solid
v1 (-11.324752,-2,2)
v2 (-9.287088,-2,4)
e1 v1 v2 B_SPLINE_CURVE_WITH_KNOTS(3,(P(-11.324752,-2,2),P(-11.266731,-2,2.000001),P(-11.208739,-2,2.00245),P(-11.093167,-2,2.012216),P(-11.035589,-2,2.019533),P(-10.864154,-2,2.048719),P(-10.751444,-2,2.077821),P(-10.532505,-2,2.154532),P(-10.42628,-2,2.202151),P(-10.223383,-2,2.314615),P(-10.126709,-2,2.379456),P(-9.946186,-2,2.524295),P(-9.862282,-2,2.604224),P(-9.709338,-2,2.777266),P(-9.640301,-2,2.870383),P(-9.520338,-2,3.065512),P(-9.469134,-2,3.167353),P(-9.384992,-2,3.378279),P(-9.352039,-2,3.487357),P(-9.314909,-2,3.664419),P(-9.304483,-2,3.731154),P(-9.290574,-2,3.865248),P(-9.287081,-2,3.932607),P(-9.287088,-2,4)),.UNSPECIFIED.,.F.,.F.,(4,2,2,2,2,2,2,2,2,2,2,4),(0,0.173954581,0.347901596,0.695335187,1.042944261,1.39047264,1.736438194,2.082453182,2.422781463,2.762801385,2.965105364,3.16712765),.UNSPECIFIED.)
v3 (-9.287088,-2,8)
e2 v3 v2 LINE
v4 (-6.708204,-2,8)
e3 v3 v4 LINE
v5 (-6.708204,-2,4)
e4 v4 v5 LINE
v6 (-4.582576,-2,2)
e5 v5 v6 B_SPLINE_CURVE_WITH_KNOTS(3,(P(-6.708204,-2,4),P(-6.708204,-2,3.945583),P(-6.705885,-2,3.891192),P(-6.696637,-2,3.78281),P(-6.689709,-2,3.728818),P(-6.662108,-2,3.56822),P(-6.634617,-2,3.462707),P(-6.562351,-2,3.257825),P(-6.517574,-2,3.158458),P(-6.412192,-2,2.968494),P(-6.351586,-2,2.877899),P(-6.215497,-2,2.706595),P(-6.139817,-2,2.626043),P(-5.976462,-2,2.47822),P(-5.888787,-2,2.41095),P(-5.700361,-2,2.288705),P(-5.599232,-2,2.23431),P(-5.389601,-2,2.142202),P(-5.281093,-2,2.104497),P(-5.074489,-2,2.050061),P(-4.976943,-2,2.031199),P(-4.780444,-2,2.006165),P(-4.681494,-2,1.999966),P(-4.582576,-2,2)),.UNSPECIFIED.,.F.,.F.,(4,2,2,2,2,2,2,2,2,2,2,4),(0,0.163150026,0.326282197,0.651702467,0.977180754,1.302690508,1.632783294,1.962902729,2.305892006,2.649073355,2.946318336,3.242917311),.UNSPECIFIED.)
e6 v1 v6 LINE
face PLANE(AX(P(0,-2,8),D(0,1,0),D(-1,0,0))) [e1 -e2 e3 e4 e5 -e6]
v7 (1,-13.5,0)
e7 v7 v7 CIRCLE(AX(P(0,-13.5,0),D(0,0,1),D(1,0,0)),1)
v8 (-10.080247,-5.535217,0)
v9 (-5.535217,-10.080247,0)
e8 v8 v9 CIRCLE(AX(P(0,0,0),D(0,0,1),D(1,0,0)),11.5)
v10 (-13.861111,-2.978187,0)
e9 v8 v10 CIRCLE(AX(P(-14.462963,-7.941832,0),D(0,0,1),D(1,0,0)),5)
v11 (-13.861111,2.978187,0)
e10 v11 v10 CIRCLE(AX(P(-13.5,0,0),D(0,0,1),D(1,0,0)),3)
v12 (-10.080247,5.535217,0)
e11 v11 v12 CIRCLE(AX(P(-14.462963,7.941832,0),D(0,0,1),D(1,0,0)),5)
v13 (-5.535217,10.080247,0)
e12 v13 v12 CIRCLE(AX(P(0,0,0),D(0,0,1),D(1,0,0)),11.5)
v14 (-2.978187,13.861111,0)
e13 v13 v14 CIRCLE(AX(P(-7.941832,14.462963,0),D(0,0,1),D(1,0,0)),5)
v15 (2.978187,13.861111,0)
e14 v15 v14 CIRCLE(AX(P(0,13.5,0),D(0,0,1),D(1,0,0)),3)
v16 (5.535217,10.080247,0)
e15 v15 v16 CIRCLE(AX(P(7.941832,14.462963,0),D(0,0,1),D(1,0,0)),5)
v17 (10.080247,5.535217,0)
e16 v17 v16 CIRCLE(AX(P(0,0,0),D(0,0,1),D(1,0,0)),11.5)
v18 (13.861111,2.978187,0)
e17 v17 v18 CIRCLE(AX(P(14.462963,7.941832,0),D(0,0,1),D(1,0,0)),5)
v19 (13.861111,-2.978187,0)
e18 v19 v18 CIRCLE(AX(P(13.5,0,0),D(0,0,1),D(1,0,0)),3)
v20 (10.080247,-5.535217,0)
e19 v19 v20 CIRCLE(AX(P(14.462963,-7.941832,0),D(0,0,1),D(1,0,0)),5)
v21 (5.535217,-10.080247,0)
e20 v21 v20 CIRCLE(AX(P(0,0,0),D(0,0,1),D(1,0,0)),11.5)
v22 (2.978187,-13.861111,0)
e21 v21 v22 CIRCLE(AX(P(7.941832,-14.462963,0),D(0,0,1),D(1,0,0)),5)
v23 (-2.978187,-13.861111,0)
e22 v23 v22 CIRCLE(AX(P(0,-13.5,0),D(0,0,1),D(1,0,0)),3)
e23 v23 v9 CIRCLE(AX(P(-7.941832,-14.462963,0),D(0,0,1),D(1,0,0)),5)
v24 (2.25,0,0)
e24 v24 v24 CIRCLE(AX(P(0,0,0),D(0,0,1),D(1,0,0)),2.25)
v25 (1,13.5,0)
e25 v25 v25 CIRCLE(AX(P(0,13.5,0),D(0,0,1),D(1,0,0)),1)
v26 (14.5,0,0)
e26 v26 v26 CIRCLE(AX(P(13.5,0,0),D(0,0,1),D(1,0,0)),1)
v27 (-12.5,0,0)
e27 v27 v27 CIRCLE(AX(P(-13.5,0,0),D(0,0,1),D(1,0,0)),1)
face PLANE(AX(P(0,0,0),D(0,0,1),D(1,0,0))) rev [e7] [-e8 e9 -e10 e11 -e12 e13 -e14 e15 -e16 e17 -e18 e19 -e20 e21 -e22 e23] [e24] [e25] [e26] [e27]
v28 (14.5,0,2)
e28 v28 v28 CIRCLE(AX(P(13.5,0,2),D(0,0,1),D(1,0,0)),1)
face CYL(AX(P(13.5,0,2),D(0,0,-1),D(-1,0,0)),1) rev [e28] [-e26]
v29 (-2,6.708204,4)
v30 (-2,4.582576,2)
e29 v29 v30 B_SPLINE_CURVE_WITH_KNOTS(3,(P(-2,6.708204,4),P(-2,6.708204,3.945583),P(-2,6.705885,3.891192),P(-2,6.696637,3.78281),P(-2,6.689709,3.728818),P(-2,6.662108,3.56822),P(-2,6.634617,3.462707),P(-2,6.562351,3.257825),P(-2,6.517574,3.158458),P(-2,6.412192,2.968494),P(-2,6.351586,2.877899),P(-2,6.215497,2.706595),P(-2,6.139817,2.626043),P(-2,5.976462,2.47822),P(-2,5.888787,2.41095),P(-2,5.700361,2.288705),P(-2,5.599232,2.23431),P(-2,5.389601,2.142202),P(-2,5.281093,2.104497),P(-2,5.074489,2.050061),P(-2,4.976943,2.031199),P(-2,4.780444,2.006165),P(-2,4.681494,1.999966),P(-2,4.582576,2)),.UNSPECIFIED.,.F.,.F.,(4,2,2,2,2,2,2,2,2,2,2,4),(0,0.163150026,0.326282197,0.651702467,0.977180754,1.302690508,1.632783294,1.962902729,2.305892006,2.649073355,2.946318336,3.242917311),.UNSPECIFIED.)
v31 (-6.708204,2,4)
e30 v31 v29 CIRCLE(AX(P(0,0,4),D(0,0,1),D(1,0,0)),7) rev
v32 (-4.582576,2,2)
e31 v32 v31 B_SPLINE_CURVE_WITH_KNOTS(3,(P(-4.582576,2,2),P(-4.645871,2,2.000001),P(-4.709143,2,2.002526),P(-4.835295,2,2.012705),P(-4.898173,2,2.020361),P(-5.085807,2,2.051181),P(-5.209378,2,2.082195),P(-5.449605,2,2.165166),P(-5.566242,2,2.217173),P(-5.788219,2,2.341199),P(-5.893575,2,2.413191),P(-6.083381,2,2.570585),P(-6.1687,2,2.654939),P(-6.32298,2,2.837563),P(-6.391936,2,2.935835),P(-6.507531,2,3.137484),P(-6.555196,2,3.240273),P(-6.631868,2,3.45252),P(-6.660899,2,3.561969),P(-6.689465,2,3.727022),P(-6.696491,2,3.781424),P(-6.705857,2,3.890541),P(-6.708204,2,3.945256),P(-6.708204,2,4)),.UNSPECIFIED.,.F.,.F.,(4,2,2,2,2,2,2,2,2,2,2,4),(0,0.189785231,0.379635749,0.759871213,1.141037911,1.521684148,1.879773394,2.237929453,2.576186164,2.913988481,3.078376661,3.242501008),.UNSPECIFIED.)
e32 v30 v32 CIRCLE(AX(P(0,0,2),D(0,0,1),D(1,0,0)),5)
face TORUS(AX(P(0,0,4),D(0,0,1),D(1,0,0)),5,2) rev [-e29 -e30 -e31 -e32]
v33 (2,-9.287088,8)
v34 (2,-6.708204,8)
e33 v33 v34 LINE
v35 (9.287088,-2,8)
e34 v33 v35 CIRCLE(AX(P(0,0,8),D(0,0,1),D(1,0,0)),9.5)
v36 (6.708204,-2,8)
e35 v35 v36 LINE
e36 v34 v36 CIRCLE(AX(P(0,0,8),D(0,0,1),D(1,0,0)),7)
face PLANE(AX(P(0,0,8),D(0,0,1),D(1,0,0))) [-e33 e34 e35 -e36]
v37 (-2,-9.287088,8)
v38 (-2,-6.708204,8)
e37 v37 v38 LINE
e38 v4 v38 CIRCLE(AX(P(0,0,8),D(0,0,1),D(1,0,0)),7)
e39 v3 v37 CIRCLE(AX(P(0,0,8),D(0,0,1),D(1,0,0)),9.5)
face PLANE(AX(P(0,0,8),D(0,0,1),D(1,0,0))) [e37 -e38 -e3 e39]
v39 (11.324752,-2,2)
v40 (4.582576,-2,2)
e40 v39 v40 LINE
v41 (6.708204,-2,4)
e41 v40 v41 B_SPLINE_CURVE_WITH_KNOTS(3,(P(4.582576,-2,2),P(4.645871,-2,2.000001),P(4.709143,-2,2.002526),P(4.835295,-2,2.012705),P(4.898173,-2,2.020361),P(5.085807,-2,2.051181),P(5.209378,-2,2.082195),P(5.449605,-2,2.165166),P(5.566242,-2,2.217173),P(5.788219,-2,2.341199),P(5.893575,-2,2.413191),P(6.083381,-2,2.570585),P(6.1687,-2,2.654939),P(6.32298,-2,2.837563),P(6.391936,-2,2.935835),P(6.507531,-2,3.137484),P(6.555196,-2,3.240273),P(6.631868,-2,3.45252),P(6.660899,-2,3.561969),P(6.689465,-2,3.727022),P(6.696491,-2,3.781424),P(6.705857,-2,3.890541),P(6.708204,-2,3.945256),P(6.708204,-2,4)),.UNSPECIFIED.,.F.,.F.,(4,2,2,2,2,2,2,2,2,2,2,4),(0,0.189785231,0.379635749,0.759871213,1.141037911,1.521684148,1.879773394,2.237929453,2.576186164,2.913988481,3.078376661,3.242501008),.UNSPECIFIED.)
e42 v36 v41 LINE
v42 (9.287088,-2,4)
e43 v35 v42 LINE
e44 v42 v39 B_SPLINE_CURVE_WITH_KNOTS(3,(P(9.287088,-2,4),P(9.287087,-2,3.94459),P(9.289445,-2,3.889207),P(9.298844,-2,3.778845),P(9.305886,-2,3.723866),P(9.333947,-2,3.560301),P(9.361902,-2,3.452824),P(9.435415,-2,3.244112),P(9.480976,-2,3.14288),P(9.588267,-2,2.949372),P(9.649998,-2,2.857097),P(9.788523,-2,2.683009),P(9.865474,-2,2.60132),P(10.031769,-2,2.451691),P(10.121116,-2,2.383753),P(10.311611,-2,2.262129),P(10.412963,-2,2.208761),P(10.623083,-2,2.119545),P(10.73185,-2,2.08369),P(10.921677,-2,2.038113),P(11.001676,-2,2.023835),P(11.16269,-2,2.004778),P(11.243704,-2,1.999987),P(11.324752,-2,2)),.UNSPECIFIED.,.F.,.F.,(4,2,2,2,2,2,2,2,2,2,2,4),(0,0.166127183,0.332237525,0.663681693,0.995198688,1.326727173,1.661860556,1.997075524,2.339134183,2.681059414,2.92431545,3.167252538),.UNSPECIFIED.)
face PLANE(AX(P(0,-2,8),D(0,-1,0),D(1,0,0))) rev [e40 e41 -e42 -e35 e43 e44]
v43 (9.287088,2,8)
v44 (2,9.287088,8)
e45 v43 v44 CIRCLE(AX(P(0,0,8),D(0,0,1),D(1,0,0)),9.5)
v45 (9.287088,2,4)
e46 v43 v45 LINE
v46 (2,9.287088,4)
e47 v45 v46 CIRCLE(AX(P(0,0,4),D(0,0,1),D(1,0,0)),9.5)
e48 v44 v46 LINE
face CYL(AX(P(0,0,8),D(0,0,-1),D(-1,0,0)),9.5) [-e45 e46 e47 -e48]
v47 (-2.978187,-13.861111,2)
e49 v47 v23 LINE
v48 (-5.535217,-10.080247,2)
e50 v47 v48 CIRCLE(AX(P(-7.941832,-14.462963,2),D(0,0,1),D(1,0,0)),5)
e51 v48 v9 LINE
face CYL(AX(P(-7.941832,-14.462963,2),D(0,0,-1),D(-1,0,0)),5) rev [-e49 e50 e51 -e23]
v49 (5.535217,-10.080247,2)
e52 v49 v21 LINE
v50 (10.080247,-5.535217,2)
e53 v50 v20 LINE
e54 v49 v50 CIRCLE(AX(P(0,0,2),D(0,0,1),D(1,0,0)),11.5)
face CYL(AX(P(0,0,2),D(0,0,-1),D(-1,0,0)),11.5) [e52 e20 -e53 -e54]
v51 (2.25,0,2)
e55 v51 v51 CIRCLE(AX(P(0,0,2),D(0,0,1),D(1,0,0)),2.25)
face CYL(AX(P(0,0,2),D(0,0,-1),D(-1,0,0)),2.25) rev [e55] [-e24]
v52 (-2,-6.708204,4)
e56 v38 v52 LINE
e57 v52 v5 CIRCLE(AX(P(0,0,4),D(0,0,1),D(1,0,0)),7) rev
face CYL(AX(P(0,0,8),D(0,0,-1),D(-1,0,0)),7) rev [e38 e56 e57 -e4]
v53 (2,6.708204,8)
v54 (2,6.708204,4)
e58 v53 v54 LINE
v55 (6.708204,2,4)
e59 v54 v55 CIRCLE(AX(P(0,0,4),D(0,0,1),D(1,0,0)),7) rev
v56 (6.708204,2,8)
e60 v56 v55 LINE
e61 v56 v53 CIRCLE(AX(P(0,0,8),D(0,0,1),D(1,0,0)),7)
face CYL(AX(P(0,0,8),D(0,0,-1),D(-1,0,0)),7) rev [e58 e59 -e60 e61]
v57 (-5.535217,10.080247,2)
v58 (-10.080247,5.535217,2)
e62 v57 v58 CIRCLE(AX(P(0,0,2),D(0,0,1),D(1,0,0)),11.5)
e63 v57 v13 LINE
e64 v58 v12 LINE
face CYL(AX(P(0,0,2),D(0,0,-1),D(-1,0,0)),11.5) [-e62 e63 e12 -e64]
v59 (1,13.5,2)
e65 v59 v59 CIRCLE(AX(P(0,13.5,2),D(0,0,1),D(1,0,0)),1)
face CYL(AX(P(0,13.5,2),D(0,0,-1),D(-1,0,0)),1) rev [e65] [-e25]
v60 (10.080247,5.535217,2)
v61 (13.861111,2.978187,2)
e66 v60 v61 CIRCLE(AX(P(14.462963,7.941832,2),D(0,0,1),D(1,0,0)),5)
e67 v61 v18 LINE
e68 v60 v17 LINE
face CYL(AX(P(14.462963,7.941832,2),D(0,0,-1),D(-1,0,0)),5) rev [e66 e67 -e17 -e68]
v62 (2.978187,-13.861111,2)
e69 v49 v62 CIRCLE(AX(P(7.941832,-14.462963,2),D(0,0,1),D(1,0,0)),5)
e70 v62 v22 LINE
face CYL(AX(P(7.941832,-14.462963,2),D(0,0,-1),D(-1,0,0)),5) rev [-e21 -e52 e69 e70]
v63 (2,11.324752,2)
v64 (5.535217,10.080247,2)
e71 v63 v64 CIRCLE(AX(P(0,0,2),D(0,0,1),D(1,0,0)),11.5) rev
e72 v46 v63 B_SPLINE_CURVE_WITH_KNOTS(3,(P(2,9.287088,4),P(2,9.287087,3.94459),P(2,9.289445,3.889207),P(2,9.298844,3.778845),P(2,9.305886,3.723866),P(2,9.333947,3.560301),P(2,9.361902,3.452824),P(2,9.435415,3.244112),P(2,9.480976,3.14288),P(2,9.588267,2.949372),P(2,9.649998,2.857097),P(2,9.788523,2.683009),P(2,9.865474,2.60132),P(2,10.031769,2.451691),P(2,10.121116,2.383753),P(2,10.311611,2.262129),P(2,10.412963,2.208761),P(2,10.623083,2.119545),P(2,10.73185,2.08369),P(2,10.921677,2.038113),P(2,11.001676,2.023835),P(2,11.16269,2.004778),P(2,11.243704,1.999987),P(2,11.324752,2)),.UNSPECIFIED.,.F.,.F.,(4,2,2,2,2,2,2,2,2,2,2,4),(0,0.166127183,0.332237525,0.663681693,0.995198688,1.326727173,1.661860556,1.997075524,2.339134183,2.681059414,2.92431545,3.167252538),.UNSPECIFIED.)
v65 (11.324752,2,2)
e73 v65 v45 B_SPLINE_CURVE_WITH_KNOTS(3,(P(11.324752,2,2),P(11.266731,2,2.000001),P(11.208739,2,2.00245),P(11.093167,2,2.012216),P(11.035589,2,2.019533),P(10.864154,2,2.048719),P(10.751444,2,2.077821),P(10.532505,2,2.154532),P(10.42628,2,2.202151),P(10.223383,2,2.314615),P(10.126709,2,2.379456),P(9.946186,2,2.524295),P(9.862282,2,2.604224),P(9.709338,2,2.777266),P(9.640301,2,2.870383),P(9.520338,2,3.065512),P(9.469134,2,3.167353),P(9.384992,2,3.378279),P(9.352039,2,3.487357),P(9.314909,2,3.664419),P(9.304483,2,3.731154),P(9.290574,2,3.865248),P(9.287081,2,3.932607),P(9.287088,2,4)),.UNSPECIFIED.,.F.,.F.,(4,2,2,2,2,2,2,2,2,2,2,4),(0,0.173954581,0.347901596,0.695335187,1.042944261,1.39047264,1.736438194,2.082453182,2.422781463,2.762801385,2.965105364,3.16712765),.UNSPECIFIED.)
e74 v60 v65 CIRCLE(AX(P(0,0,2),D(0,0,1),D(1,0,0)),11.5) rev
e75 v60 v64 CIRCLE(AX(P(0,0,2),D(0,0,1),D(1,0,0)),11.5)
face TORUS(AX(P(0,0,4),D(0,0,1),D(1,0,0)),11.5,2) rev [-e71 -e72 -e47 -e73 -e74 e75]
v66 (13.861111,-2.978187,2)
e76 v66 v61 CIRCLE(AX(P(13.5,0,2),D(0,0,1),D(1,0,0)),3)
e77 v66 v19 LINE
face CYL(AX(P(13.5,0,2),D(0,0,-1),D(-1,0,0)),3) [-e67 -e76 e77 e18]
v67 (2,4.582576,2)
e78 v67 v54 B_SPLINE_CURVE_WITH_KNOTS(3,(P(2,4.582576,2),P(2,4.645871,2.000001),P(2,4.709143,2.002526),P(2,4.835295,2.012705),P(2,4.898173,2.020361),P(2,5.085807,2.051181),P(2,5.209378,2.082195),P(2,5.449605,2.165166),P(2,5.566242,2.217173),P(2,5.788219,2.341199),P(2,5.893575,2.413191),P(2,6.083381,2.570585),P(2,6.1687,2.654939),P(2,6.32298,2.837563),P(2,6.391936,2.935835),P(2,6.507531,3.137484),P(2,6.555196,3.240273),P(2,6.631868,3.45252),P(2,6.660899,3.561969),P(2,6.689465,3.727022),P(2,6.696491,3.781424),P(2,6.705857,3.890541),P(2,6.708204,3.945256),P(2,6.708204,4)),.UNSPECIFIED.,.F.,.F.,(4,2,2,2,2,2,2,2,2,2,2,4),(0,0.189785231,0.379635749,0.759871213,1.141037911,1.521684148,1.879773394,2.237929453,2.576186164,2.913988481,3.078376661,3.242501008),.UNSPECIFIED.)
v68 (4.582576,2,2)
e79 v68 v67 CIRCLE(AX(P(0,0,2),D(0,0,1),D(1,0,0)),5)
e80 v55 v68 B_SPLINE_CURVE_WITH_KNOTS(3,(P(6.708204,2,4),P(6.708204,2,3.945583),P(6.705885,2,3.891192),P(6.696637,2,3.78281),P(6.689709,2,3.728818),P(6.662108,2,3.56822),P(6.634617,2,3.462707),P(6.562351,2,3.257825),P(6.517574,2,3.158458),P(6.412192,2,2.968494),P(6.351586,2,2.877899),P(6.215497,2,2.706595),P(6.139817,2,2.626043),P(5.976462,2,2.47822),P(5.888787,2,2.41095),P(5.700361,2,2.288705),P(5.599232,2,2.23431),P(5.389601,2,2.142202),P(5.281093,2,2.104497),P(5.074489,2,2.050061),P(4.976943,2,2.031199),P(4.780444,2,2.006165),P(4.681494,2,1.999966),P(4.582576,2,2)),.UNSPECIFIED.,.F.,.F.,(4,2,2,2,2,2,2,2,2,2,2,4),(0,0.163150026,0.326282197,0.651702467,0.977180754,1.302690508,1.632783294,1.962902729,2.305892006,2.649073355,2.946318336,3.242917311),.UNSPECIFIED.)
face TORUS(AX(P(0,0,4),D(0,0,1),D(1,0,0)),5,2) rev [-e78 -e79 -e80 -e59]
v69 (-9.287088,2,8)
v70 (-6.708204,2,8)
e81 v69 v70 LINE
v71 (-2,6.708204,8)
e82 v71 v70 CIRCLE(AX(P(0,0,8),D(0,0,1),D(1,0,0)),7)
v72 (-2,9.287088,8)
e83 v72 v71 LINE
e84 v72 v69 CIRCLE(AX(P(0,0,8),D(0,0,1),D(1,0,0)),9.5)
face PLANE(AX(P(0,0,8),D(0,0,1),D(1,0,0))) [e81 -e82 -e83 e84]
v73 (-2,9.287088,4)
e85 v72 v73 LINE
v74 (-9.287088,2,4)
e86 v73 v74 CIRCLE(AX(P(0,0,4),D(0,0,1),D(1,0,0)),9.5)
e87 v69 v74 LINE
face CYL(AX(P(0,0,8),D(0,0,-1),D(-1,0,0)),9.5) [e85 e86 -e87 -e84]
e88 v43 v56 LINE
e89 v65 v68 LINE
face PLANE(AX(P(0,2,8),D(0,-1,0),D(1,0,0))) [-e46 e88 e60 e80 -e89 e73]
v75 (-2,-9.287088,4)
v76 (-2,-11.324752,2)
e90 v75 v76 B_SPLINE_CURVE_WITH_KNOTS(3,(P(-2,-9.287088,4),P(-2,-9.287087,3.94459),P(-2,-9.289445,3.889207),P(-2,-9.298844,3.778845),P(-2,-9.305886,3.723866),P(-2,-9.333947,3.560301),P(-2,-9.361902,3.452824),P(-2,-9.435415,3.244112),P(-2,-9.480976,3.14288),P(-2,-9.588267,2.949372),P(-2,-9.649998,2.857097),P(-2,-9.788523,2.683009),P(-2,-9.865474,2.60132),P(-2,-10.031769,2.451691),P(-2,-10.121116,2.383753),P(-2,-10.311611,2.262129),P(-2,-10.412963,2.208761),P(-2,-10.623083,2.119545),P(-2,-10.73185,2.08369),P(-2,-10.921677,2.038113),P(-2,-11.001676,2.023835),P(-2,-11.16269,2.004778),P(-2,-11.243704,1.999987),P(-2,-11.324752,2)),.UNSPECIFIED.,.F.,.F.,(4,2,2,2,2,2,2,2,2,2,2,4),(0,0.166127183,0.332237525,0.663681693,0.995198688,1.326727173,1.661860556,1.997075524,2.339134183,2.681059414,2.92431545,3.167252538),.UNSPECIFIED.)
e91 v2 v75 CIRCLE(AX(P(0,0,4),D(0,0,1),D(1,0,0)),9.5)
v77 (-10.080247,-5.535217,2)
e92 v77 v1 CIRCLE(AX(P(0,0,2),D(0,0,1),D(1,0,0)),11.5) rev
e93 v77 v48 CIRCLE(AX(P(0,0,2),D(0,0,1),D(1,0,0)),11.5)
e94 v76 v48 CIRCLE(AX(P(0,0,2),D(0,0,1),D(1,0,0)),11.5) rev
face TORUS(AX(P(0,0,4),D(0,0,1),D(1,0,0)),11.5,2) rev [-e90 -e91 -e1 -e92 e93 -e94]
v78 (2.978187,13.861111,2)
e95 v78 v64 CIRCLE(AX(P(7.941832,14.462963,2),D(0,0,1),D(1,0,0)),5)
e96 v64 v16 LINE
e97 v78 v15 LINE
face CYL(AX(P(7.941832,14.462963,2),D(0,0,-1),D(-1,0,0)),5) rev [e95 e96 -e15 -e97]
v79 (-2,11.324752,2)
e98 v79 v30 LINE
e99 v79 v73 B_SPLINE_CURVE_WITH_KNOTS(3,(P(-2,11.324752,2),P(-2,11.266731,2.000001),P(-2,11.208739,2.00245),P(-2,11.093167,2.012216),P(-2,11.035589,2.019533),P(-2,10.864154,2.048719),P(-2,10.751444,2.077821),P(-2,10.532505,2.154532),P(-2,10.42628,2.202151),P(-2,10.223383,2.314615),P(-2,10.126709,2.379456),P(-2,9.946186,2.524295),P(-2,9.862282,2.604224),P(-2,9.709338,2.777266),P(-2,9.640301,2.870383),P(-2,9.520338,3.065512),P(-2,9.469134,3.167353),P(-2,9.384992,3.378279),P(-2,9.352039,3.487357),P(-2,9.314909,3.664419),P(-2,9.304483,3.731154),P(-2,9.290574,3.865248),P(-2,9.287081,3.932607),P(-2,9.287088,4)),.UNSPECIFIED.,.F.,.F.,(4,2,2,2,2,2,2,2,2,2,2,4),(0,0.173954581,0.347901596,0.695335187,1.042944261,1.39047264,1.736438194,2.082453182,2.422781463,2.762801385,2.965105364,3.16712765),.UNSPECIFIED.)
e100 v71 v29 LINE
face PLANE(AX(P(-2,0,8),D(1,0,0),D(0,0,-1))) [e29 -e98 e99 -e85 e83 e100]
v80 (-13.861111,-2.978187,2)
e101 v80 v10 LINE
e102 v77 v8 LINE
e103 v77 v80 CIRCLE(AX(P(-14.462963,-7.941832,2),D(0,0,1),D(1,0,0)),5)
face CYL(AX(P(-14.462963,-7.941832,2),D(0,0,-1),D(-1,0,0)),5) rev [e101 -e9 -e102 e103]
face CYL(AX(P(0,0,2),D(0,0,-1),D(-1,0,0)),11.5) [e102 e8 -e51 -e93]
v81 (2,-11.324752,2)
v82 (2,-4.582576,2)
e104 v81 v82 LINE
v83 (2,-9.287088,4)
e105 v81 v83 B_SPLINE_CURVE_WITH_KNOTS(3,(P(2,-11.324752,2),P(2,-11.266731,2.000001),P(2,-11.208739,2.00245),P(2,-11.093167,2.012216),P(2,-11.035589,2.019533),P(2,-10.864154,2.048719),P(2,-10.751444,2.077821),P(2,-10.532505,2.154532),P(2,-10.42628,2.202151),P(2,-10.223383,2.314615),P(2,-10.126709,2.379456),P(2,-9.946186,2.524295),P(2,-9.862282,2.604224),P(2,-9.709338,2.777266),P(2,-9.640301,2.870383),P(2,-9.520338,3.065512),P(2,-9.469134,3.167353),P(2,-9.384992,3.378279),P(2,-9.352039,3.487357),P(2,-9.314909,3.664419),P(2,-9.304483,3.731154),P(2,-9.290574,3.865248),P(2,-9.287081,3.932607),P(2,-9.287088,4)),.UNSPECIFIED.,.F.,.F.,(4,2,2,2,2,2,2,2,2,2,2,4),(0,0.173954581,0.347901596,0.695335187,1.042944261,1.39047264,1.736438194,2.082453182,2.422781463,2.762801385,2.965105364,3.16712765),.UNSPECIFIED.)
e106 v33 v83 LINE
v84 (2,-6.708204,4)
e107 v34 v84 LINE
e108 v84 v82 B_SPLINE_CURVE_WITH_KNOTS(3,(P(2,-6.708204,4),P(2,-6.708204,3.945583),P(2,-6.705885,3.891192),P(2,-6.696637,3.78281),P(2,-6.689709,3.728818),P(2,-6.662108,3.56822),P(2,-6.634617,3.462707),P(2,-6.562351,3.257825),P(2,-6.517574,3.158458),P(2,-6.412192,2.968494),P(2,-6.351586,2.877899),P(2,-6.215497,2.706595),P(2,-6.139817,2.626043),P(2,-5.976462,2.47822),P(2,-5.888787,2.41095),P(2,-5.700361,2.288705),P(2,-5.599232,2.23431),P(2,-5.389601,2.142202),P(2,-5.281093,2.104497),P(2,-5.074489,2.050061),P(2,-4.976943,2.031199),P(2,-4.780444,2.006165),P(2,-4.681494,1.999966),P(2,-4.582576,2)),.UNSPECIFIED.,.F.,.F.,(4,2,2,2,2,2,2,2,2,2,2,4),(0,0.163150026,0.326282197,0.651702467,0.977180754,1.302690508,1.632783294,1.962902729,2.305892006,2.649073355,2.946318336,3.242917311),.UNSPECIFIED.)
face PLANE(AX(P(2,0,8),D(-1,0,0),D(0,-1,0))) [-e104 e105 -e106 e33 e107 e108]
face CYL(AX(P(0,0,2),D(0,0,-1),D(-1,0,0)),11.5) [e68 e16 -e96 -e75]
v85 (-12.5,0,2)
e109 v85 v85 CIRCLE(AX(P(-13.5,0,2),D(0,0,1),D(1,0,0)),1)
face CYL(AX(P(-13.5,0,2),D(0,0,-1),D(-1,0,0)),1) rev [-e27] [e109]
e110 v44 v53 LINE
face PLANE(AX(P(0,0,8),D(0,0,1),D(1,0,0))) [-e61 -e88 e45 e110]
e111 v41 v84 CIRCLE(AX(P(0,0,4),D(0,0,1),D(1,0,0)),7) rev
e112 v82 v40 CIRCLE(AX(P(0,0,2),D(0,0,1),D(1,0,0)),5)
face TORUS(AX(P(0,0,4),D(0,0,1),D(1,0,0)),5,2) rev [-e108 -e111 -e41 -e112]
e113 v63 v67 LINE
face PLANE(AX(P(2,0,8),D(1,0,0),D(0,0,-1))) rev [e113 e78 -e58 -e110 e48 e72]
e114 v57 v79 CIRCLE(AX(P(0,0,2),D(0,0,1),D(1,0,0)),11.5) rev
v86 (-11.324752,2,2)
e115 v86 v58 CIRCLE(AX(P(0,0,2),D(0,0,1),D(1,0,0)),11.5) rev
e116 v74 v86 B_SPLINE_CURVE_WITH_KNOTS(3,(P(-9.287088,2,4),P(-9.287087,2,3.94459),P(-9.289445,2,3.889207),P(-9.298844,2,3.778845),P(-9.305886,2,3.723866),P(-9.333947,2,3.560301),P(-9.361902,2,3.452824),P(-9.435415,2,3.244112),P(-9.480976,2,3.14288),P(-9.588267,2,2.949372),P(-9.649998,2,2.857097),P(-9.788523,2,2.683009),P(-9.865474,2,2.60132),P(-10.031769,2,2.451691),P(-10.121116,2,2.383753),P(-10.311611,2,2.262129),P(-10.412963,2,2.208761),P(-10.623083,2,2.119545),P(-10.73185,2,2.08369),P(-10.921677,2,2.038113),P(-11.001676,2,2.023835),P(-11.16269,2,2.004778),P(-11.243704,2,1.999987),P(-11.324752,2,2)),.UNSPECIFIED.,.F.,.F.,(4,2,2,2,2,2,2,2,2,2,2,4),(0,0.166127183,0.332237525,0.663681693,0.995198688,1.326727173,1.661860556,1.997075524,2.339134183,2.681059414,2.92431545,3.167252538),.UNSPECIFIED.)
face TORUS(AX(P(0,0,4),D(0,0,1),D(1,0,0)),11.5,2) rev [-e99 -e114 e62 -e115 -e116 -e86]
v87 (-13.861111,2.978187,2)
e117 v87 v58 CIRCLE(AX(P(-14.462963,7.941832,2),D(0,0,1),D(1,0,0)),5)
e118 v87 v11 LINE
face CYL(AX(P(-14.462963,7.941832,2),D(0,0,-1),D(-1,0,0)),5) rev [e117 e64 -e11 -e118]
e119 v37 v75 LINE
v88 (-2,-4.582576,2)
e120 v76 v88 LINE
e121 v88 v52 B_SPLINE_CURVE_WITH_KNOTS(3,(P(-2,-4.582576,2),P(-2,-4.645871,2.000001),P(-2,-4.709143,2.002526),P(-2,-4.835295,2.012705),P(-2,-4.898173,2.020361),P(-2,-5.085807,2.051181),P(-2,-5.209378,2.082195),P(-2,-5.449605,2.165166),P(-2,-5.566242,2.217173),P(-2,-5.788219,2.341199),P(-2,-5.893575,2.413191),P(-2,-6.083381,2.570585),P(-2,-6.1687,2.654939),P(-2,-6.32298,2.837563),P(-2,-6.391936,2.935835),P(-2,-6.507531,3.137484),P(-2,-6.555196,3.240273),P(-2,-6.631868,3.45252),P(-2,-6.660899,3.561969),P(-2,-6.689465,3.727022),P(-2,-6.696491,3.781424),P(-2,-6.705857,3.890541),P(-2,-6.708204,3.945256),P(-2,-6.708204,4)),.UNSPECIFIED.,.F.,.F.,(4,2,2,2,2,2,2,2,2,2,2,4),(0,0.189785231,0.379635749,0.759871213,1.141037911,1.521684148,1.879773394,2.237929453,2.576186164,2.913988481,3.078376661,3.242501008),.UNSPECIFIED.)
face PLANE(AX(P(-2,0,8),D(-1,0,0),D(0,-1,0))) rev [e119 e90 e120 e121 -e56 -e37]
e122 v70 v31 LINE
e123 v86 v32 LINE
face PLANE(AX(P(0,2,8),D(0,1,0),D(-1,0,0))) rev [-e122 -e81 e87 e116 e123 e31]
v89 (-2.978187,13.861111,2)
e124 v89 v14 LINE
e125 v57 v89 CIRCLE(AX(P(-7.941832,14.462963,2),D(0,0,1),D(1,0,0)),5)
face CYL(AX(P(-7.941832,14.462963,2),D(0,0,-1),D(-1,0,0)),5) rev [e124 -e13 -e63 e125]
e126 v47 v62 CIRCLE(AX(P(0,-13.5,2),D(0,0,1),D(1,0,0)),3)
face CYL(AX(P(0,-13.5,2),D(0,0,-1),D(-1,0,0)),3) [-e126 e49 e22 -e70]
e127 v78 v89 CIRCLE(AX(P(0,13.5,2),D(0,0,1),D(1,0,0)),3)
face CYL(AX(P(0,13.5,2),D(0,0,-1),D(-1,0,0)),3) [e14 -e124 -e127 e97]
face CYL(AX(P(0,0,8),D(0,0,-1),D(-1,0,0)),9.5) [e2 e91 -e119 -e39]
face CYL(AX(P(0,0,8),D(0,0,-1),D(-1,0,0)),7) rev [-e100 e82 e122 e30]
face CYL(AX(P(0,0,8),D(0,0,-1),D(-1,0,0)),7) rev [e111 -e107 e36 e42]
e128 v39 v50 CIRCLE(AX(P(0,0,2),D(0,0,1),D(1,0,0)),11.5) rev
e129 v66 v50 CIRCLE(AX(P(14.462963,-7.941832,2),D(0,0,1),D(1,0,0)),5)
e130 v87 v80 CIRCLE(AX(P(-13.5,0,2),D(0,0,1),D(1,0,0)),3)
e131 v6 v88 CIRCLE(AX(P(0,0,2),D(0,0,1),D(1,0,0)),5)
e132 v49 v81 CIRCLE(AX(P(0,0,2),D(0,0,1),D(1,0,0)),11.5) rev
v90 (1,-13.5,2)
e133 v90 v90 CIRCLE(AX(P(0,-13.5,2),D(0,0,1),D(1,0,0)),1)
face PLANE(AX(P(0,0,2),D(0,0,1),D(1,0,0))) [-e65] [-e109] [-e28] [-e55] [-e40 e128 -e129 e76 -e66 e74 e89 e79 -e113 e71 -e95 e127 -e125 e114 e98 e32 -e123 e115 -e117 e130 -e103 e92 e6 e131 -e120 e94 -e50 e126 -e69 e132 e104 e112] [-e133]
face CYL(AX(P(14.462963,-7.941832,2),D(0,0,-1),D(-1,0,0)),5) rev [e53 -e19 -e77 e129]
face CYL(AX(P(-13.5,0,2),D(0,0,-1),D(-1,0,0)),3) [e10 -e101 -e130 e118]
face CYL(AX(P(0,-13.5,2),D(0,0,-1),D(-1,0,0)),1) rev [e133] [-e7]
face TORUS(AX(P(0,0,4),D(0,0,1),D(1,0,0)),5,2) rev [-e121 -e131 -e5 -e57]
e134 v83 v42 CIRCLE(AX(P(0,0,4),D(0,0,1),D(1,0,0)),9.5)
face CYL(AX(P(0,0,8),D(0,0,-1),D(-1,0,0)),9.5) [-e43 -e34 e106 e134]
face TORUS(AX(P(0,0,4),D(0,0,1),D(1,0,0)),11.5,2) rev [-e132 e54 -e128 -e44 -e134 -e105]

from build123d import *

# Parameters (mm, degrees)
SKETCH2_R           = 1.000000000000002
SKETCH2_R_2         = 1.0000000000000033
SKETCH2_R_3         = 2.2500000000000036
SKETCH2_R_4         = 0.9999999999999979
BOSS_EXTRUDE1_DEPTH = 2
BOSS_EXTRUDE2_DEPTH = 6
FILLET1_R           = 2


with BuildPart() as part:
    # Sketch2 → Boss-Extrude1 (new body)
    with BuildSketch(Plane.XY):
        with BuildLine():
            ThreePointArc((-5.535216541496454, -10.080246913580245), (-3.800103213400962, -11.661877619065859), (-2.9781871609138566, -13.86111111111111))
            ThreePointArc((-2.978187160913855, -13.86111111111111), (-1.22e-15, -16.500000000000007), (2.9781871609138544, -13.861111111111112))
            ThreePointArc((2.978187160913855, -13.861111111111114), (3.800103213400959, -11.661877619065862), (5.535216541496451, -10.080246913580247))
            ThreePointArc((5.5352165414964505, -10.080246913580245), (8.131727983645298, -8.131727983645296), (10.080246913580247, -5.535216541496448))
            ThreePointArc((10.080246913580249, -5.535216541496447), (11.661877619065859, -3.800103213400953), (13.861111111111109, -2.978187160913847))
            ThreePointArc((13.861111111111109, -2.9781871609138464), (16.5, 1.11e-15), (13.86111111111111, 2.97818716091385))
            ThreePointArc((13.861111111111109, 2.9781871609138504), (11.661877619065862, 3.8001032134009582), (10.080246913580249, 5.53521654149645))
            ThreePointArc((10.080246913580245, 5.53521654149645), (8.131727983645296, 8.131727983645295), (5.535216541496451, 10.080246913580247))
            ThreePointArc((5.535216541496451, 10.080246913580247), (3.8001032134009582, 11.66187761906586), (2.978187160913855, 13.861111111111112))
            ThreePointArc((2.978187160913854, 13.861111111111112), (-1.1e-16, 16.500000000000007), (-2.978187160913854, 13.861111111111112))
            ThreePointArc((-2.978187160913855, 13.86111111111111), (-3.8001032134009582, 11.661877619065859), (-5.535216541496451, 10.080246913580247))
            ThreePointArc((-5.53521654149645, 10.080246913580245), (-8.131727983645293, 8.131727983645298), (-10.080246913580247, 5.535216541496451))
            ThreePointArc((-10.080246913580247, 5.53521654149645), (-11.66187761906586, 3.800103213400954), (-13.861111111111112, 2.978187160913847))
            ThreePointArc((-13.861111111111112, 2.978187160913847), (-16.5, -4.22e-15), (-13.86111111111111, -2.978187160913854))
            ThreePointArc((-13.86111111111111, -2.978187160913853), (-11.661877619065862, -3.8001032134009574), (-10.080246913580249, -5.535216541496448))
            ThreePointArc((-10.080246913580247, -5.535216541496449), (-8.131727983645298, -8.131727983645291), (-5.535216541496458, -10.080246913580243))
        make_face()
        with Locations((0, -13.500000000000002)):
            Circle(SKETCH2_R, mode=Mode.SUBTRACT)
        with Locations((-13.5, -3.47e-15)):
            Circle(SKETCH2_R_2, mode=Mode.SUBTRACT)
        Circle(SKETCH2_R_3, mode=Mode.SUBTRACT)
        with Locations((13.499999999999998, 1.95e-15)):
            Circle(SKETCH2_R_4, mode=Mode.SUBTRACT)
        with Locations((0, 13.500000000000002)):
            Circle(SKETCH2_R, mode=Mode.SUBTRACT)
    extrude(amount=BOSS_EXTRUDE1_DEPTH)

    # Sketch3 → Boss-Extrude2 (add)
    with BuildSketch(Plane.XY.offset(2)):
        with BuildLine():
            Line((-2, 6.708203932499395), (-2, 9.287087810503353))
            ThreePointArc((-2.0000000000000093, 9.287087810503355), (-6.717514421272232, 6.717514421272174), (-9.28708781050337, 1.9999999999999327))
            Line((-9.287087810503404, 2.0000000000000977), (-6.708203932499403, 2.0000000000000706))
            ThreePointArc((-6.708203932499378, 1.99999999999997), (-4.949747468305826, 4.94974746830584), (-1.9999999999999525, 6.708203932499384))
        make_face()
        with BuildLine():
            Line((6.708203932499369, 1.9999999999999767), (9.287087810503435, 1.9999999999999678))
            ThreePointArc((9.287087810503401, 1.999999999999796), (6.7175144212723605, 6.717514421272045), (2.0000000000002314, 9.287087810503307))
            Line((2, 9.28708781050326), (2, 6.708203932499432))
            ThreePointArc((1.9999999999998863, 6.708203932499403), (4.949747468305795, 4.949747468305869), (6.708203932499373, 1.9999999999999882))
        make_face()
        with BuildLine():
            ThreePointArc((2.0000000000001776, -9.287087810503317), (6.717514421272327, -6.717514421272079), (9.28708781050339, -1.9999999999998435))
            Line((9.287087810503428, -2.000000000000032), (6.708203932499365, -2.000000000000023))
            ThreePointArc((6.708203932499362, -2.0000000000000218), (4.94974746830577, -4.949747468305895), (1.999999999999852, -6.708203932499413))
            Line((1.9999999999999531, -6.708203932499438), (1.9999999999999352, -9.287087810503271))
        make_face()
        with BuildLine():
            ThreePointArc((-9.287087810503401, -1.9999999999997904), (-6.717514421272299, -6.7175144212721065), (-2.0000000000000573, -9.287087810503344))
            Line((-2.0000000000000653, -9.287087810503346), (-2.000000000000047, -6.708203932499385))
            ThreePointArc((-1.9999999999999913, -6.708203932499372), (-4.94974746830588, -4.949747468305786), (-6.70820393249941, -1.9999999999998643))
            Line((-6.708203932499425, -1.9999999999999296), (-9.287087810503424, -1.9999999999999025))
        make_face()
    extrude(amount=BOSS_EXTRUDE2_DEPTH)

    # Fillet1
    # the kernel refuses this fillet: 2 mm, written as the material it adds along each edge
    with BuildSketch(Plane(origin=(2.22e-15, -8.9e-16, 2), x_dir=(-0.30916520847427376, -0.9510083458461649, 0), z_dir=(-0.9510083458461649, 0.30916520847427376, 0))) as fillet1_piece_1_section:
        with BuildLine():
            CenterArc((9.499999999999982 + FILLET1_R, FILLET1_R), FILLET1_R, 180, 90)
            Line((9.499999999999982, FILLET1_R), (9.499999999999982, 0))
            Line((9.499999999999982, 0), (9.499999999999982 + FILLET1_R, 0))
        make_face()
    fillet1_piece_1 = revolve(axis=Axis((2.22e-15, -8.9e-16, 2), (0, 0, 1)), revolution_arc=126.01785857571643, mode=Mode.PRIVATE)
    fillet1_piece_1 = split(fillet1_piece_1, bisect_by=Plane(origin=(-2.000000000000068, -9.669758969346212, 2.4215494769043446), z_dir=(-1, 7.06e-15, 0)), keep=Keep.TOP, mode=Mode.PRIVATE)
    add(fillet1_piece_1)
    with BuildSketch(Plane(origin=(2.22e-15, -8.9e-16, 2), x_dir=(-0.30916520847427376, -0.9510083458461649, 0), z_dir=(-0.9510083458461649, 0.30916520847427376, 0))) as fillet1_piece_2_section:
        with BuildLine():
            CenterArc((9.499999999999982 + FILLET1_R, FILLET1_R), FILLET1_R, 180, 90)
            Line((9.499999999999982, FILLET1_R), (9.499999999999982, 0))
            Line((9.499999999999982, 0), (9.499999999999982 + FILLET1_R, 0))
        make_face()
    fillet1_piece_2 = revolve(axis=Axis((2.22e-15, -8.9e-16, 2), (0, 0, 1)), revolution_arc=126.01785857571643, mode=Mode.PRIVATE)
    fillet1_piece_2 = split(fillet1_piece_2, bisect_by=Plane(origin=(7.120332445105562, -2.0000000000000244, 2.5696707124735063), z_dir=(-3.44e-15, -1, 0)), keep=Keep.TOP, mode=Mode.PRIVATE)
    fillet1_piece_2 = split(fillet1_piece_2, bisect_by=Plane(origin=(1.9999999999999503, -7.120332445105584, 2.5696707124735063), z_dir=(1, -6.97e-15, 0)), keep=Keep.TOP, mode=Mode.PRIVATE)
    add(fillet1_piece_2)
    with BuildSketch(Plane(origin=(2.22e-15, -8.9e-16, 2), x_dir=(-0.30916520847427376, -0.9510083458461649, 0), z_dir=(-0.9510083458461649, 0.30916520847427376, 0))) as fillet1_piece_3_section:
        with BuildLine():
            CenterArc((9.499999999999982 + FILLET1_R, FILLET1_R), FILLET1_R, 180, 90)
            Line((9.499999999999982, FILLET1_R), (9.499999999999982, 0))
            Line((9.499999999999982, 0), (9.499999999999982 + FILLET1_R, 0))
        make_face()
    fillet1_piece_3 = revolve(axis=Axis((2.22e-15, -8.9e-16, 2), (0, 0, 1)), revolution_arc=126.01785857571643, mode=Mode.PRIVATE)
    fillet1_piece_3 = split(fillet1_piece_3, bisect_by=Plane(origin=(9.669758933153426, 1.9999999999999665, 2.4215494191812885), z_dir=(3.44e-15, 1, 0)), keep=Keep.TOP, mode=Mode.PRIVATE)
    add(fillet1_piece_3)
    with BuildSketch(Plane(origin=(-3.55e-15, 2.89e-15, 2), x_dir=(0.9111837032687716, 0.4120003141957629, 0), z_dir=(-0.4120003141957629, 0.9111837032687716, 0))) as fillet1_piece_4_section:
        with BuildLine():
            CenterArc((7.000000000006363 - FILLET1_R, -FILLET1_R), FILLET1_R, 0, 90)
            Line((7.000000000006364, -FILLET1_R), (7.000000000006363, 0))
            Line((7.000000000006363, 0), (7.000000000006363 - FILLET1_R, 0))
        make_face()
    fillet1_piece_4 = revolve(axis=Axis((-3.55e-15, 2.89e-15, 2), (0, 0, -1)), revolution_arc=138.6611069957662, mode=Mode.PRIVATE)
    fillet1_piece_4 = split(fillet1_piece_4, bisect_by=Plane(origin=(6.213522354625176, 1.9999999999999785, 2.5168822123416867), z_dir=(3.44e-15, 1, 0)), keep=Keep.TOP, mode=Mode.PRIVATE)
    add(fillet1_piece_4)
    with BuildSketch(Plane(origin=(-3.55e-15, 2.89e-15, 2), x_dir=(0.9111837032687716, 0.4120003141957629, 0), z_dir=(-0.4120003141957629, 0.9111837032687716, 0))) as fillet1_piece_5_section:
        with BuildLine():
            CenterArc((7.000000000006363 - FILLET1_R, -FILLET1_R), FILLET1_R, 0, 90)
            Line((7.000000000006364, -FILLET1_R), (7.000000000006363, 0))
            Line((7.000000000006363, 0), (7.000000000006363 - FILLET1_R, 0))
        make_face()
    fillet1_piece_5 = revolve(axis=Axis((-3.55e-15, 2.89e-15, 2), (0, 0, -1)), revolution_arc=138.6611069957662, mode=Mode.PRIVATE)
    fillet1_piece_5 = split(fillet1_piece_5, bisect_by=Plane(origin=(4.488001494655117, -2.0000000000000155, 2.480936836750208), z_dir=(-3.44e-15, -1, 0)), keep=Keep.TOP, mode=Mode.PRIVATE)
    fillet1_piece_5 = split(fillet1_piece_5, bisect_by=Plane(origin=(1.9999999999999687, -4.488001186110315, 2.480936836750208), z_dir=(1, -6.97e-15, 0)), keep=Keep.TOP, mode=Mode.PRIVATE)
    add(fillet1_piece_5)
    with BuildSketch(Plane(origin=(-3.55e-15, 2.89e-15, 2), x_dir=(0.9111837032687716, 0.4120003141957629, 0), z_dir=(-0.4120003141957629, 0.9111837032687716, 0))) as fillet1_piece_6_section:
        with BuildLine():
            CenterArc((7.000000000006363 - FILLET1_R, -FILLET1_R), FILLET1_R, 0, 90)
            Line((7.000000000006364, -FILLET1_R), (7.000000000006363, 0))
            Line((7.000000000006363, 0), (7.000000000006363 - FILLET1_R, 0))
        make_face()
    fillet1_piece_6 = revolve(axis=Axis((-3.55e-15, 2.89e-15, 2), (0, 0, -1)), revolution_arc=138.6611069957662, mode=Mode.PRIVATE)
    fillet1_piece_6 = split(fillet1_piece_6, bisect_by=Plane(origin=(-2.0000000000000435, -6.213522307784187, 2.516882137154894), z_dir=(-1, 7.06e-15, 0)), keep=Keep.TOP, mode=Mode.PRIVATE)
    add(fillet1_piece_6)
    with BuildSketch(Plane(origin=(-4.88e-15, -5.33e-15, 2), x_dir=(-0.9510083458461519, 0.30916520847431384, 0), z_dir=(0.30916520847431384, 0.9510083458461519, 0))) as fillet1_piece_7_section:
        with BuildLine():
            CenterArc((9.499999999999979 + FILLET1_R, FILLET1_R), FILLET1_R, 180, 90)
            Line((9.49999999999998, FILLET1_R), (9.499999999999979, 0))
            Line((9.499999999999979, 0), (9.499999999999979 + FILLET1_R, 0))
        make_face()
    fillet1_piece_7 = revolve(axis=Axis((-4.88e-15, -5.33e-15, 2), (0, 0, 1)), revolution_arc=126.01785857571757, mode=Mode.PRIVATE)
    fillet1_piece_7 = split(fillet1_piece_7, bisect_by=Plane(origin=(-9.669758969346136, 2.0000000000001017, 2.421549476904353), z_dir=(1.05e-14, 1, 0)), keep=Keep.TOP, mode=Mode.PRIVATE)
    add(fillet1_piece_7)
    with BuildSketch(Plane(origin=(-4.88e-15, -5.33e-15, 2), x_dir=(-0.9510083458461519, 0.30916520847431384, 0), z_dir=(0.30916520847431384, 0.9510083458461519, 0))) as fillet1_piece_8_section:
        with BuildLine():
            CenterArc((9.499999999999979 + FILLET1_R, FILLET1_R), FILLET1_R, 180, 90)
            Line((9.49999999999998, FILLET1_R), (9.499999999999979, 0))
            Line((9.499999999999979, 0), (9.499999999999979 + FILLET1_R, 0))
        make_face()
    fillet1_piece_8 = revolve(axis=Axis((-4.88e-15, -5.33e-15, 2), (0, 0, 1)), revolution_arc=126.01785857571757, mode=Mode.PRIVATE)
    fillet1_piece_8 = split(fillet1_piece_8, bisect_by=Plane(origin=(-2.00000000000005, -7.120332445105555, 2.5696707124735054), z_dir=(-1, 7.06e-15, 0)), keep=Keep.TOP, mode=Mode.PRIVATE)
    fillet1_piece_8 = split(fillet1_piece_8, bisect_by=Plane(origin=(-7.12033244510559, -1.9999999999999254, 2.5696707124735054), z_dir=(-1.05e-14, -1, 0)), keep=Keep.TOP, mode=Mode.PRIVATE)
    add(fillet1_piece_8)
    with BuildSketch(Plane(origin=(-4.88e-15, -5.33e-15, 2), x_dir=(-0.9510083458461519, 0.30916520847431384, 0), z_dir=(0.30916520847431384, 0.9510083458461519, 0))) as fillet1_piece_9_section:
        with BuildLine():
            CenterArc((9.499999999999979 + FILLET1_R, FILLET1_R), FILLET1_R, 180, 90)
            Line((9.49999999999998, FILLET1_R), (9.499999999999979, 0))
            Line((9.499999999999979, 0), (9.499999999999979 + FILLET1_R, 0))
        make_face()
    fillet1_piece_9 = revolve(axis=Axis((-4.88e-15, -5.33e-15, 2), (0, 0, 1)), revolution_arc=126.01785857571757, mode=Mode.PRIVATE)
    fillet1_piece_9 = split(fillet1_piece_9, bisect_by=Plane(origin=(1.9999999999999325, -9.66975893315346, 2.421549419181287), z_dir=(1, -6.97e-15, 0)), keep=Keep.TOP, mode=Mode.PRIVATE)
    add(fillet1_piece_9)
    with BuildSketch(Plane(origin=(6.22e-15, 6.88e-15, 2), x_dir=(0.41200031419576666, -0.9111837032687699, 0), z_dir=(0.9111837032687699, 0.41200031419576666, 0))) as fillet1_piece_10_section:
        with BuildLine():
            CenterArc((7.000000000006322 - FILLET1_R, -FILLET1_R), FILLET1_R, 0, 90)
            Line((7.000000000006323, -FILLET1_R), (7.000000000006322, 0))
            Line((7.000000000006322, 0), (7.000000000006322 - FILLET1_R, 0))
        make_face()
    fillet1_piece_10 = revolve(axis=Axis((6.22e-15, 6.88e-15, 2), (0, 0, -1)), revolution_arc=138.6611069957663, mode=Mode.PRIVATE)
    fillet1_piece_10 = split(fillet1_piece_10, bisect_by=Plane(origin=(1.9999999999999567, -6.213522354625126, 2.5168822123416836), z_dir=(1, -6.97e-15, 0)), keep=Keep.TOP, mode=Mode.PRIVATE)
    add(fillet1_piece_10)
    with BuildSketch(Plane(origin=(6.22e-15, 6.88e-15, 2), x_dir=(0.41200031419576666, -0.9111837032687699, 0), z_dir=(0.9111837032687699, 0.41200031419576666, 0))) as fillet1_piece_11_section:
        with BuildLine():
            CenterArc((7.000000000006322 - FILLET1_R, -FILLET1_R), FILLET1_R, 0, 90)
            Line((7.000000000006323, -FILLET1_R), (7.000000000006322, 0))
            Line((7.000000000006322, 0), (7.000000000006322 - FILLET1_R, 0))
        make_face()
    fillet1_piece_11 = revolve(axis=Axis((6.22e-15, 6.88e-15, 2), (0, 0, -1)), revolution_arc=138.6611069957663, mode=Mode.PRIVATE)
    fillet1_piece_11 = split(fillet1_piece_11, bisect_by=Plane(origin=(-2.0000000000000315, -4.48800149465508, 2.480936836750209), z_dir=(-1, 7.06e-15, 0)), keep=Keep.TOP, mode=Mode.PRIVATE)
    fillet1_piece_11 = split(fillet1_piece_11, bisect_by=Plane(origin=(-4.488001186110293, -1.999999999999953, 2.480936836750209), z_dir=(-1.05e-14, -1, 0)), keep=Keep.TOP, mode=Mode.PRIVATE)
    add(fillet1_piece_11)
    with BuildSketch(Plane(origin=(6.22e-15, 6.88e-15, 2), x_dir=(0.41200031419576666, -0.9111837032687699, 0), z_dir=(0.9111837032687699, 0.41200031419576666, 0))) as fillet1_piece_12_section:
        with BuildLine():
            CenterArc((7.000000000006322 - FILLET1_R, -FILLET1_R), FILLET1_R, 0, 90)
            Line((7.000000000006323, -FILLET1_R), (7.000000000006322, 0))
            Line((7.000000000006322, 0), (7.000000000006322 - FILLET1_R, 0))
        make_face()
    fillet1_piece_12 = revolve(axis=Axis((6.22e-15, 6.88e-15, 2), (0, 0, -1)), revolution_arc=138.6611069957663, mode=Mode.PRIVATE)
    fillet1_piece_12 = split(fillet1_piece_12, bisect_by=Plane(origin=(-6.21352230778415, 2.0000000000000653, 2.5168821371548966), z_dir=(1.05e-14, 1, 0)), keep=Keep.TOP, mode=Mode.PRIVATE)
    add(fillet1_piece_12)
    with BuildSketch(Plane(origin=(-1.33e-15, 2.22e-15, 2), x_dir=(0.3091652084742909, 0.9510083458461592, 0), z_dir=(0.9510083458461592, -0.3091652084742909, 0))) as fillet1_piece_13_section:
        with BuildLine():
            CenterArc((9.499999999999982 + FILLET1_R, FILLET1_R), FILLET1_R, 180, 90)
            Line((9.499999999999984, FILLET1_R), (9.499999999999982, 0))
            Line((9.499999999999982, 0), (9.499999999999982 + FILLET1_R, 0))
        make_face()
    fillet1_piece_13 = revolve(axis=Axis((-1.33e-15, 2.22e-15, 2), (0, 0, 1)), revolution_arc=126.01785857571691, mode=Mode.PRIVATE)
    fillet1_piece_13 = split(fillet1_piece_13, bisect_by=Plane(origin=(2, 9.66975896934618, 2.4215494769043477), z_dir=(1, 0, 0)), keep=Keep.TOP, mode=Mode.PRIVATE)
    add(fillet1_piece_13)
    with BuildSketch(Plane(origin=(-1.33e-15, 2.22e-15, 2), x_dir=(0.3091652084742909, 0.9510083458461592, 0), z_dir=(0.9510083458461592, -0.3091652084742909, 0))) as fillet1_piece_14_section:
        with BuildLine():
            CenterArc((9.499999999999982 + FILLET1_R, FILLET1_R), FILLET1_R, 180, 90)
            Line((9.499999999999984, FILLET1_R), (9.499999999999982, 0))
            Line((9.499999999999982, 0), (9.499999999999982 + FILLET1_R, 0))
        make_face()
    fillet1_piece_14 = revolve(axis=Axis((-1.33e-15, 2.22e-15, 2), (0, 0, 1)), revolution_arc=126.01785857571691, mode=Mode.PRIVATE)
    fillet1_piece_14 = split(fillet1_piece_14, bisect_by=Plane(origin=(-7.120332445105595, 2.000000000000075, 2.569670712473507), z_dir=(1.05e-14, 1, 0)), keep=Keep.TOP, mode=Mode.PRIVATE)
    fillet1_piece_14 = split(fillet1_piece_14, bisect_by=Plane(origin=(-2, 7.120332445105617, 2.569670712473507), z_dir=(-1, 0, 0)), keep=Keep.TOP, mode=Mode.PRIVATE)
    add(fillet1_piece_14)
    with BuildSketch(Plane(origin=(-1.33e-15, 2.22e-15, 2), x_dir=(0.3091652084742909, 0.9510083458461592, 0), z_dir=(0.9510083458461592, -0.3091652084742909, 0))) as fillet1_piece_15_section:
        with BuildLine():
            CenterArc((9.499999999999982 + FILLET1_R, FILLET1_R), FILLET1_R, 180, 90)
            Line((9.499999999999984, FILLET1_R), (9.499999999999982, 0))
            Line((9.499999999999982, 0), (9.499999999999982 + FILLET1_R, 0))
        make_face()
    fillet1_piece_15 = revolve(axis=Axis((-1.33e-15, 2.22e-15, 2), (0, 0, 1)), revolution_arc=126.01785857571691, mode=Mode.PRIVATE)
    fillet1_piece_15 = split(fillet1_piece_15, bisect_by=Plane(origin=(-9.669758933153439, -1.9999999999998985, 2.4215494191812867), z_dir=(-1.05e-14, -1, 0)), keep=Keep.TOP, mode=Mode.PRIVATE)
    add(fillet1_piece_15)
    with BuildSketch(Plane(origin=(5.33e-15, -4.88e-15, 2), x_dir=(-0.9111837032687685, -0.4120003141957696, 0), z_dir=(0.4120003141957696, -0.9111837032687685, 0))) as fillet1_piece_16_section:
        with BuildLine():
            CenterArc((7.000000000006354 - FILLET1_R, -FILLET1_R), FILLET1_R, 0, 90)
            Line((7.000000000006354, -FILLET1_R), (7.000000000006354, 0))
            Line((7.000000000006354, 0), (7.000000000006354 - FILLET1_R, 0))
        make_face()
    fillet1_piece_16 = revolve(axis=Axis((5.33e-15, -4.88e-15, 2), (0, 0, -1)), revolution_arc=138.66110699576575, mode=Mode.PRIVATE)
    fillet1_piece_16 = split(fillet1_piece_16, bisect_by=Plane(origin=(-6.213522354625151, -1.9999999999999347, 2.5168822123416796), z_dir=(-1.05e-14, -1, 0)), keep=Keep.TOP, mode=Mode.PRIVATE)
    add(fillet1_piece_16)
    with BuildSketch(Plane(origin=(5.33e-15, -4.88e-15, 2), x_dir=(-0.9111837032687685, -0.4120003141957696, 0), z_dir=(0.4120003141957696, -0.9111837032687685, 0))) as fillet1_piece_17_section:
        with BuildLine():
            CenterArc((7.000000000006354 - FILLET1_R, -FILLET1_R), FILLET1_R, 0, 90)
            Line((7.000000000006354, -FILLET1_R), (7.000000000006354, 0))
            Line((7.000000000006354, 0), (7.000000000006354 - FILLET1_R, 0))
        make_face()
    fillet1_piece_17 = revolve(axis=Axis((5.33e-15, -4.88e-15, 2), (0, 0, -1)), revolution_arc=138.66110699576575, mode=Mode.PRIVATE)
    fillet1_piece_17 = split(fillet1_piece_17, bisect_by=Plane(origin=(-4.488001494655129, 2.000000000000047, 2.4809368367502085), z_dir=(1.05e-14, 1, 0)), keep=Keep.TOP, mode=Mode.PRIVATE)
    fillet1_piece_17 = split(fillet1_piece_17, bisect_by=Plane(origin=(-2, 4.488001186110333, 2.4809368367502085), z_dir=(-1, 0, 0)), keep=Keep.TOP, mode=Mode.PRIVATE)
    add(fillet1_piece_17)
    with BuildSketch(Plane(origin=(5.33e-15, -4.88e-15, 2), x_dir=(-0.9111837032687685, -0.4120003141957696, 0), z_dir=(0.4120003141957696, -0.9111837032687685, 0))) as fillet1_piece_18_section:
        with BuildLine():
            CenterArc((7.000000000006354 - FILLET1_R, -FILLET1_R), FILLET1_R, 0, 90)
            Line((7.000000000006354, -FILLET1_R), (7.000000000006354, 0))
            Line((7.000000000006354, 0), (7.000000000006354 - FILLET1_R, 0))
        make_face()
    fillet1_piece_18 = revolve(axis=Axis((5.33e-15, -4.88e-15, 2), (0, 0, -1)), revolution_arc=138.66110699576575, mode=Mode.PRIVATE)
    fillet1_piece_18 = split(fillet1_piece_18, bisect_by=Plane(origin=(2, 6.213522307784205, 2.5168821371548975), z_dir=(1, 0, 0)), keep=Keep.TOP, mode=Mode.PRIVATE)
    add(fillet1_piece_18)
    with BuildSketch(Plane(origin=(-1.33e-15, -2.22e-15, 2), x_dir=(0.9510083458461523, -0.30916520847431234, 0), z_dir=(-0.30916520847431234, -0.9510083458461523, 0))) as fillet1_piece_19_section:
        with BuildLine():
            CenterArc((9.49999999999999 + FILLET1_R, FILLET1_R), FILLET1_R, 180, 90)
            Line((9.49999999999999, FILLET1_R), (9.49999999999999, 0))
            Line((9.49999999999999, 0), (9.49999999999999 + FILLET1_R, 0))
        make_face()
    fillet1_piece_19 = revolve(axis=Axis((-1.33e-15, -2.22e-15, 2), (0, 0, 1)), revolution_arc=126.01785857571633, mode=Mode.PRIVATE)
    fillet1_piece_19 = split(fillet1_piece_19, bisect_by=Plane(origin=(9.669758969346143, -2.0000000000000333, 2.421549476904354), z_dir=(-3.44e-15, -1, 0)), keep=Keep.TOP, mode=Mode.PRIVATE)
    add(fillet1_piece_19)
    with BuildSketch(Plane(origin=(-1.33e-15, -2.22e-15, 2), x_dir=(0.9510083458461523, -0.30916520847431234, 0), z_dir=(-0.30916520847431234, -0.9510083458461523, 0))) as fillet1_piece_20_section:
        with BuildLine():
            CenterArc((9.49999999999999 + FILLET1_R, FILLET1_R), FILLET1_R, 180, 90)
            Line((9.49999999999999, FILLET1_R), (9.49999999999999, 0))
            Line((9.49999999999999, 0), (9.49999999999999 + FILLET1_R, 0))
        make_face()
    fillet1_piece_20 = revolve(axis=Axis((-1.33e-15, -2.22e-15, 2), (0, 0, 1)), revolution_arc=126.01785857571633, mode=Mode.PRIVATE)
    fillet1_piece_20 = split(fillet1_piece_20, bisect_by=Plane(origin=(2, 7.120332445105565, 2.5696707124735063), z_dir=(1, 0, 0)), keep=Keep.TOP, mode=Mode.PRIVATE)
    fillet1_piece_20 = split(fillet1_piece_20, bisect_by=Plane(origin=(7.120332445105574, 1.9999999999999754, 2.5696707124735063), z_dir=(3.44e-15, 1, 0)), keep=Keep.TOP, mode=Mode.PRIVATE)
    add(fillet1_piece_20)
    with BuildSketch(Plane(origin=(-1.33e-15, -2.22e-15, 2), x_dir=(0.9510083458461523, -0.30916520847431234, 0), z_dir=(-0.30916520847431234, -0.9510083458461523, 0))) as fillet1_piece_21_section:
        with BuildLine():
            CenterArc((9.49999999999999 + FILLET1_R, FILLET1_R), FILLET1_R, 180, 90)
            Line((9.49999999999999, FILLET1_R), (9.49999999999999, 0))
            Line((9.49999999999999, 0), (9.49999999999999 + FILLET1_R, 0))
        make_face()
    fillet1_piece_21 = revolve(axis=Axis((-1.33e-15, -2.22e-15, 2), (0, 0, 1)), revolution_arc=126.01785857571633, mode=Mode.PRIVATE)
    fillet1_piece_21 = split(fillet1_piece_21, bisect_by=Plane(origin=(-2, 9.669758933153492, 2.4215494191812805), z_dir=(-1, 0, 0)), keep=Keep.TOP, mode=Mode.PRIVATE)
    add(fillet1_piece_21)
    with BuildSketch(Plane(origin=(-7.55e-15, -7.77e-15, 2), x_dir=(-0.41200031419578037, 0.9111837032687635, 0), z_dir=(-0.9111837032687635, -0.41200031419578037, 0))) as fillet1_piece_22_section:
        with BuildLine():
            CenterArc((7.0000000000063665 - FILLET1_R, -FILLET1_R), FILLET1_R, 0, 90)
            Line((7.0000000000063665, -FILLET1_R), (7.0000000000063665, 0))
            Line((7.0000000000063665, 0), (7.0000000000063665 - FILLET1_R, 0))
        make_face()
    fillet1_piece_22 = revolve(axis=Axis((-7.55e-15, -7.77e-15, 2), (0, 0, -1)), revolution_arc=138.66110699576606, mode=Mode.PRIVATE)
    fillet1_piece_22 = split(fillet1_piece_22, bisect_by=Plane(origin=(-2, 6.213522354625137, 2.5168822123416787), z_dir=(-1, 0, 0)), keep=Keep.TOP, mode=Mode.PRIVATE)
    add(fillet1_piece_22)
    with BuildSketch(Plane(origin=(-7.55e-15, -7.77e-15, 2), x_dir=(-0.41200031419578037, 0.9111837032687635, 0), z_dir=(-0.9111837032687635, -0.41200031419578037, 0))) as fillet1_piece_23_section:
        with BuildLine():
            CenterArc((7.0000000000063665 - FILLET1_R, -FILLET1_R), FILLET1_R, 0, 90)
            Line((7.0000000000063665, -FILLET1_R), (7.0000000000063665, 0))
            Line((7.0000000000063665, 0), (7.0000000000063665 - FILLET1_R, 0))
        make_face()
    fillet1_piece_23 = revolve(axis=Axis((-7.55e-15, -7.77e-15, 2), (0, 0, -1)), revolution_arc=138.66110699576606, mode=Mode.PRIVATE)
    fillet1_piece_23 = split(fillet1_piece_23, bisect_by=Plane(origin=(2, 4.488001494655124, 2.4809368367502085), z_dir=(1, 0, 0)), keep=Keep.TOP, mode=Mode.PRIVATE)
    fillet1_piece_23 = split(fillet1_piece_23, bisect_by=Plane(origin=(4.488001186110306, 1.9999999999999842, 2.4809368367502085), z_dir=(3.44e-15, 1, 0)), keep=Keep.TOP, mode=Mode.PRIVATE)
    add(fillet1_piece_23)
    with BuildSketch(Plane(origin=(-7.55e-15, -7.77e-15, 2), x_dir=(-0.41200031419578037, 0.9111837032687635, 0), z_dir=(-0.9111837032687635, -0.41200031419578037, 0))) as fillet1_piece_24_section:
        with BuildLine():
            CenterArc((7.0000000000063665 - FILLET1_R, -FILLET1_R), FILLET1_R, 0, 90)
            Line((7.0000000000063665, -FILLET1_R), (7.0000000000063665, 0))
            Line((7.0000000000063665, 0), (7.0000000000063665 - FILLET1_R, 0))
        make_face()
    fillet1_piece_24 = revolve(axis=Axis((-7.55e-15, -7.77e-15, 2), (0, 0, -1)), revolution_arc=138.66110699576606, mode=Mode.PRIVATE)
    fillet1_piece_24 = split(fillet1_piece_24, bisect_by=Plane(origin=(6.213522307784227, -2.0000000000000213, 2.5168821371548997), z_dir=(-3.44e-15, -1, 0)), keep=Keep.TOP, mode=Mode.PRIVATE)
    add(fillet1_piece_24)


solid = part.part
